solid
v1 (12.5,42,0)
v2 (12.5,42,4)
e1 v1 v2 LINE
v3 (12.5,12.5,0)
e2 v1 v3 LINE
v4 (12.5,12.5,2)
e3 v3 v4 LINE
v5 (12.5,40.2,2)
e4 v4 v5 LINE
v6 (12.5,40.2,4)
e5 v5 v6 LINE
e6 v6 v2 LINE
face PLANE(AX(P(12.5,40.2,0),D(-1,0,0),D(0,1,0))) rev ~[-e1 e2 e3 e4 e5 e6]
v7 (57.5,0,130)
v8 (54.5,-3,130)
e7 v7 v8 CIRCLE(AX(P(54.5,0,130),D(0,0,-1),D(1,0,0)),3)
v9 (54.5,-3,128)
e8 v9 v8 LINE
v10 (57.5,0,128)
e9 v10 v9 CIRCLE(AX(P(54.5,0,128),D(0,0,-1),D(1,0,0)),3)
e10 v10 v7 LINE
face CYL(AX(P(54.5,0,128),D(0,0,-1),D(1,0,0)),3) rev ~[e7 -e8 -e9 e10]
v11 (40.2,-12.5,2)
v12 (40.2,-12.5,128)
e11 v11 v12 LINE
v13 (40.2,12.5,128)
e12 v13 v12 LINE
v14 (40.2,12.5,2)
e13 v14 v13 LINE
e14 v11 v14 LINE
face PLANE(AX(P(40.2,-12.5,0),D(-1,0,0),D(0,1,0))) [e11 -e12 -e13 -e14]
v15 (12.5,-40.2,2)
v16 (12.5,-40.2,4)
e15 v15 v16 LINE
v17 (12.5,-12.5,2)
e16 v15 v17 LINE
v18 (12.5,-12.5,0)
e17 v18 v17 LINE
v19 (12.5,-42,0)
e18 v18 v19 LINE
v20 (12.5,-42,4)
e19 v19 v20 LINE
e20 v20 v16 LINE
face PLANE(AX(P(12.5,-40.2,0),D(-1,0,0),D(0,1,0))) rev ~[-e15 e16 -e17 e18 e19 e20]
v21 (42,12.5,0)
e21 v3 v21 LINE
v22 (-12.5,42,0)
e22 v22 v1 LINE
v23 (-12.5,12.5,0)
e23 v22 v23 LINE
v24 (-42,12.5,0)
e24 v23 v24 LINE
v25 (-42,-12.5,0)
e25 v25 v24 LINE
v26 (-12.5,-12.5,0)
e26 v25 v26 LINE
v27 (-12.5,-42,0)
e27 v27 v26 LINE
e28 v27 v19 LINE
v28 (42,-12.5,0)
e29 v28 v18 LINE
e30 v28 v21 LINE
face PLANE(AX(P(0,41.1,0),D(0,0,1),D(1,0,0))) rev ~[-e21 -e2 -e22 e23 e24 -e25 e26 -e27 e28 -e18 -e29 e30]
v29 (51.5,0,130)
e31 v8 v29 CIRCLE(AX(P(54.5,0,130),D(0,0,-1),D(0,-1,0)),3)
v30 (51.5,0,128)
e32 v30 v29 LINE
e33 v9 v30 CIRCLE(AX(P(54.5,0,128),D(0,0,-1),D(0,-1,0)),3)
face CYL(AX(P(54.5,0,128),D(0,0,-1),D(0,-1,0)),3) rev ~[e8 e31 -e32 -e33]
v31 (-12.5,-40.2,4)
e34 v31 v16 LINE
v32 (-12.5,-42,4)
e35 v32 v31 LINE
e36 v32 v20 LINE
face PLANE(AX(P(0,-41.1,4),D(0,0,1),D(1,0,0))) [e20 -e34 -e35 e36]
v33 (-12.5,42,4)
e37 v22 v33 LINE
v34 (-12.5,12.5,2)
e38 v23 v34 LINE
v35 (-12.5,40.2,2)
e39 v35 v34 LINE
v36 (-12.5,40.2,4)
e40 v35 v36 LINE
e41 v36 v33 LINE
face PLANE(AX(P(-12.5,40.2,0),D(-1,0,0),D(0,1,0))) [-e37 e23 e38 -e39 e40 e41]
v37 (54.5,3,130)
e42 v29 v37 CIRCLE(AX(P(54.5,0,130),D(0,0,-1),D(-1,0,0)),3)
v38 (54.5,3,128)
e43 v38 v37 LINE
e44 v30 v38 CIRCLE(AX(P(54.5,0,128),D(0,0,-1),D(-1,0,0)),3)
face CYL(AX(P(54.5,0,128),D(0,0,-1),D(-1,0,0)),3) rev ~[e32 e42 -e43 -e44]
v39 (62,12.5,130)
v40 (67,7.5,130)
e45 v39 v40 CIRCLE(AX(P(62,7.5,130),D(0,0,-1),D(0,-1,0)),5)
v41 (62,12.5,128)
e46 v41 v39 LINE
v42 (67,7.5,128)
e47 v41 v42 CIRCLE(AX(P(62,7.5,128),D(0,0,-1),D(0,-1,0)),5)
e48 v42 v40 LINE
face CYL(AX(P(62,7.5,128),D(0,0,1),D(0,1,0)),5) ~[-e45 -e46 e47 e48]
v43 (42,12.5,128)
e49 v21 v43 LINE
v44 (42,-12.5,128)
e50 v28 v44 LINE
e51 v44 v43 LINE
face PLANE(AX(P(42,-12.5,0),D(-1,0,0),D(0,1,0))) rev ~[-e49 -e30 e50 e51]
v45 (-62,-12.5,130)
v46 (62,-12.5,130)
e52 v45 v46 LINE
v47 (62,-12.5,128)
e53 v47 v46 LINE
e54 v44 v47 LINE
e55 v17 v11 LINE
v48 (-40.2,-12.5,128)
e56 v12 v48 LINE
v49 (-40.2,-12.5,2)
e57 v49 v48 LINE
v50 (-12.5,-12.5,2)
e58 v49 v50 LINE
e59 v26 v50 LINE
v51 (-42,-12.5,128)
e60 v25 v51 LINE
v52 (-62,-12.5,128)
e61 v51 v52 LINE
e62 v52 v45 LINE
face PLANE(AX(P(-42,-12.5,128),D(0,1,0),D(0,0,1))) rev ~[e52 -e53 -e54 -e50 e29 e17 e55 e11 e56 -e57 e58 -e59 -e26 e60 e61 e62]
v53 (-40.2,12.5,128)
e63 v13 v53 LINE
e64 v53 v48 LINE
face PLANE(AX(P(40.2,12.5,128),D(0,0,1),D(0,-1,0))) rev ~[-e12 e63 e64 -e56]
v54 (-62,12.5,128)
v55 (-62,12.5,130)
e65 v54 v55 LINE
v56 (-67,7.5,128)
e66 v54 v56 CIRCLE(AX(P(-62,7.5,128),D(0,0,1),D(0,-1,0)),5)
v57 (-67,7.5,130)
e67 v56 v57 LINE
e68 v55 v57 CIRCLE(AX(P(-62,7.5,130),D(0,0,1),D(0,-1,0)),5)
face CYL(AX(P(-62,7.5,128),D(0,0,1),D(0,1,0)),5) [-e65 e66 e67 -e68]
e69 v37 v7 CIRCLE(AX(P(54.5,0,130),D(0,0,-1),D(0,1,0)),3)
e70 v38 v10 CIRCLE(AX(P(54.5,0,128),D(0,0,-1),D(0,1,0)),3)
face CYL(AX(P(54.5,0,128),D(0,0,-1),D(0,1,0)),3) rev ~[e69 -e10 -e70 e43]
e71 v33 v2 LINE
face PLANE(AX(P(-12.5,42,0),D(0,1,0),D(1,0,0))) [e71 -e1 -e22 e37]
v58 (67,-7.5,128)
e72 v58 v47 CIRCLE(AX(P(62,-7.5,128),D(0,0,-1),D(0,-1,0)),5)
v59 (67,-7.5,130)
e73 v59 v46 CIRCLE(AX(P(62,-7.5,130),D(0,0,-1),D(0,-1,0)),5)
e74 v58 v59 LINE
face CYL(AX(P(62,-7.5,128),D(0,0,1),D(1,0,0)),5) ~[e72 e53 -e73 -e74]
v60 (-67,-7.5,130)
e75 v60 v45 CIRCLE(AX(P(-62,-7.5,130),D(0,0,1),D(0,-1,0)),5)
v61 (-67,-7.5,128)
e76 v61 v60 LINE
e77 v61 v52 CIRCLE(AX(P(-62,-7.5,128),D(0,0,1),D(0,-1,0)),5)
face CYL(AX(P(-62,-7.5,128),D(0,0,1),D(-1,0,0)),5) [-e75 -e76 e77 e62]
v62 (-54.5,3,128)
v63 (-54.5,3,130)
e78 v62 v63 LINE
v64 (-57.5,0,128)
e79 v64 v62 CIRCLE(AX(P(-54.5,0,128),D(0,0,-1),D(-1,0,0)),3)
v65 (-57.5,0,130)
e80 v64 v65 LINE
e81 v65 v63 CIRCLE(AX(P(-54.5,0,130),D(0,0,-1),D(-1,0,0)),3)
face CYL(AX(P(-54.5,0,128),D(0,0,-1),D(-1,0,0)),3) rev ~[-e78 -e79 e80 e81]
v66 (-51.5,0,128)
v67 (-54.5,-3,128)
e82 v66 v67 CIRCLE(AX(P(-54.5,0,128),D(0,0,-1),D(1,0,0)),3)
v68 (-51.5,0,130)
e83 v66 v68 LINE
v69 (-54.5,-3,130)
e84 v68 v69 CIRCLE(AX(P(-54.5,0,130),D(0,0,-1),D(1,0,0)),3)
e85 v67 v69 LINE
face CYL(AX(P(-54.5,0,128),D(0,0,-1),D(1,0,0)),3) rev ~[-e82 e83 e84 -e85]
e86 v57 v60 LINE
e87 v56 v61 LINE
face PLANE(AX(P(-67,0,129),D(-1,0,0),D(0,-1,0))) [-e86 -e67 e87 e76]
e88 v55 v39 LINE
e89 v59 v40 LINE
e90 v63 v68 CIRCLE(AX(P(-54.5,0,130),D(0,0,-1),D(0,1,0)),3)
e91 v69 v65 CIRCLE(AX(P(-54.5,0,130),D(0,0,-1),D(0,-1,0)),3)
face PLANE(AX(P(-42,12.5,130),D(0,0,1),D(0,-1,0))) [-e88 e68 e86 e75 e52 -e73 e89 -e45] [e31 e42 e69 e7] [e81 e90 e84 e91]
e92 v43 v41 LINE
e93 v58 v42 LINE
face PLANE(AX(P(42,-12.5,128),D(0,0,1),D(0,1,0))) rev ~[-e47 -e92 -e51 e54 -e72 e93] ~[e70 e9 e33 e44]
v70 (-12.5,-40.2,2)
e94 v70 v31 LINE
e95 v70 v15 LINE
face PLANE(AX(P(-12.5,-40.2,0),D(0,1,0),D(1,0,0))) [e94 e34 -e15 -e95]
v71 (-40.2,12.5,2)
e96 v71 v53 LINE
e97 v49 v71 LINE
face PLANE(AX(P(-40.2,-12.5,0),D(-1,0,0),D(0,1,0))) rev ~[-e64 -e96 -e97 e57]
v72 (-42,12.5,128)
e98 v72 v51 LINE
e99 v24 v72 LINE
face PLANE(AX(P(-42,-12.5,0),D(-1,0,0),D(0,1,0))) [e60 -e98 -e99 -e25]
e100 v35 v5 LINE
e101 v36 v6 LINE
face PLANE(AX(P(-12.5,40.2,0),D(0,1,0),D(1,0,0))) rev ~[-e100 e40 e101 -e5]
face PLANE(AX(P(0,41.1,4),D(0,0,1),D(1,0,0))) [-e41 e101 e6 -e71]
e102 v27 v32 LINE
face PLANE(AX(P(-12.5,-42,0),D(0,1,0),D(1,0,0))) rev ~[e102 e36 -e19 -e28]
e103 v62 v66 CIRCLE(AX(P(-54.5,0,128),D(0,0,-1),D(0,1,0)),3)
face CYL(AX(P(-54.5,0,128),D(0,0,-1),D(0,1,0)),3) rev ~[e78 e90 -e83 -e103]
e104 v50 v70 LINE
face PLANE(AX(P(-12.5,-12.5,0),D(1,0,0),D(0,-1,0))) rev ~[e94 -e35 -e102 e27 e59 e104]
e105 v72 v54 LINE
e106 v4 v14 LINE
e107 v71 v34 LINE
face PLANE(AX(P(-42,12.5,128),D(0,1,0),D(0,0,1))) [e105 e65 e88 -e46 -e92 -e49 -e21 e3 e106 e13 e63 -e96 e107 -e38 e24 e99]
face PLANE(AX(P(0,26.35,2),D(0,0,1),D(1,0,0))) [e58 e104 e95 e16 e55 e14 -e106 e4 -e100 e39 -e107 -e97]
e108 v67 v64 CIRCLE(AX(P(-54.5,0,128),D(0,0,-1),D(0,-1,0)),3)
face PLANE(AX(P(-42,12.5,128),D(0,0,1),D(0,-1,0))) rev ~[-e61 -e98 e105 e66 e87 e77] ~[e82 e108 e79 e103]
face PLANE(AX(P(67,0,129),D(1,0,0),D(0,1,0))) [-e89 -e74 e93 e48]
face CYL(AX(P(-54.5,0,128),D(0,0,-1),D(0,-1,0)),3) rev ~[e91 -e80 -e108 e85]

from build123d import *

# Parameters (mm, degrees)
F0_W      = 25
F0_H      = 27.7
F0_H_2    = 25
F0_W_2    = 27.7
F1_DEPTH  = 2
F0_W_3    = 1.8
F2_DEPTH  = 130
F0_H_3    = 1.8
F3_DEPTH  = 4
F4_W      = 25
F4_H      = 2
F5_DEPTH  = 80.4
F7_W      = 25
F7_H      = 2
F8_DEPTH  = 25
F6_W      = 25
F6_H      = 2
F9_DEPTH  = 25
F12_DEPTH = 25
F13_R     = 5


with BuildPart() as f1:
    # F0 (on Top) → F1 (new body)
    with BuildSketch(Plane.XY):
        with Locations((0, 26.35)):
            Rectangle(F0_W, F0_H)
        Rectangle(F0_W, F0_H_2)
        with Locations((26.35, 0)):
            Rectangle(F0_W_2, F0_H_2)
        with Locations((0, -26.35)):
            Rectangle(F0_W, F0_H)
        with Locations((-26.35, 0)):
            Rectangle(F0_W_2, F0_H_2)
    extrude(amount=F1_DEPTH)

    # F0 (on Top) → F2 (join)
    with BuildSketch(Plane.XY):
        with Locations((-41.1, 0)):
            Rectangle(F0_W_3, F0_H_2)
        with Locations((41.1, 0)):
            Rectangle(F0_W_3, F0_H_2)
    extrude(amount=F2_DEPTH)

    # F0 (on Top) → F3 (join)
    with BuildSketch(Plane.XY):
        with Locations((0, 41.1)):
            Rectangle(F0_W, F0_H_3)
        with Locations((0, -41.1)):
            Rectangle(F0_W, F0_H_3)
    extrude(amount=F3_DEPTH)

    # F4 (on face) → F5 (join)
    with BuildSketch(Plane(origin=(40.2, 0, 0), x_dir=(0, -1, 0), z_dir=(-1, 0, 0))):
        with Locations((0, 129)):
            Rectangle(F4_W, F4_H)
    extrude(amount=F5_DEPTH)

    # F7 (on face) → F8 (join)
    with BuildSketch(Plane.YZ.offset(42)):
        with Locations((0, 129)):
            Rectangle(F7_W, F7_H)
    extrude(amount=F8_DEPTH)

    # F6 (on face) → F9 (join)
    with BuildSketch(Plane(origin=(-42, 0, 0), x_dir=(0, -1, 0), z_dir=(-1, 0, 0))):
        with Locations((0, 129)):
            Rectangle(F6_W, F6_H)
    extrude(amount=F9_DEPTH)

    # F11 (on face) + F10 (on face) → F12 (cut)
    with BuildSketch(Plane(origin=(0, 0, 128), x_dir=(1, 0, 0), z_dir=(0, 0, -1))):
        with BuildLine():
            ThreePointArc((-51.5, 0), (-52.3786796564, 2.1213203436), (-54.5, 3))
            Line((-54.5, 3), (-54.5, 0))
            Line((-54.5, 0), (-51.5, 0))
        make_face()
        with BuildLine():
            Line((-54.5, 0), (-54.5, 3))
            ThreePointArc((-54.5, 3), (-56.6213203436, 2.1213203436), (-57.5, 0))
            Line((-57.5, 0), (-54.5, 0))
        make_face()
        with BuildLine():
            Line((-51.5, 0), (-54.5, 0))
            Line((-54.5, 0), (-54.5, -3))
            ThreePointArc((-54.5, -3), (-52.3786796564, -2.1213203436), (-51.5, 0))
        make_face()
        with BuildLine():
            Line((-54.5, -3), (-54.5, 0))
            Line((-54.5, 0), (-57.5, 0))
            ThreePointArc((-57.5, 0), (-56.6213203436, -2.1213203436), (-54.5, -3))
        make_face()
    with BuildSketch(Plane(origin=(0, 0, 128), x_dir=(1, 0, 0), z_dir=(0, 0, -1))):
        with BuildLine():
            Line((54.5, 0), (54.5, 3))
            ThreePointArc((54.5, 3), (52.3786796564, 2.1213203436), (51.5, 0))
            Line((51.5, 0), (54.5, 0))
        make_face()
        with BuildLine():
            ThreePointArc((57.5, 0), (56.6213203436, 2.1213203436), (54.5, 3))
            Line((54.5, 3), (54.5, 0))
            Line((54.5, 0), (57.5, 0))
        make_face()
        with BuildLine():
            Line((57.5, 0), (54.5, 0))
            Line((54.5, 0), (54.5, -3))
            ThreePointArc((54.5, -3), (56.6213203436, -2.1213203436), (57.5, 0))
        make_face()
        with BuildLine():
            Line((54.5, -3), (54.5, 0))
            Line((54.5, 0), (51.5, 0))
            ThreePointArc((51.5, 0), (52.3786796564, -2.1213203436), (54.5, -3))
        make_face()
    extrude(amount=-F12_DEPTH, mode=Mode.SUBTRACT)

    # F13
    f13_edges = [f1.edges().sort_by_distance(p)[0] for p in [
        (67, 12.5, 129),
        (67, -12.5, 129),
        (-67, 12.5, 129),
        (-67, -12.5, 129),
    ]]
    fillet(f13_edges, radius=F13_R)


solid = f1.part
